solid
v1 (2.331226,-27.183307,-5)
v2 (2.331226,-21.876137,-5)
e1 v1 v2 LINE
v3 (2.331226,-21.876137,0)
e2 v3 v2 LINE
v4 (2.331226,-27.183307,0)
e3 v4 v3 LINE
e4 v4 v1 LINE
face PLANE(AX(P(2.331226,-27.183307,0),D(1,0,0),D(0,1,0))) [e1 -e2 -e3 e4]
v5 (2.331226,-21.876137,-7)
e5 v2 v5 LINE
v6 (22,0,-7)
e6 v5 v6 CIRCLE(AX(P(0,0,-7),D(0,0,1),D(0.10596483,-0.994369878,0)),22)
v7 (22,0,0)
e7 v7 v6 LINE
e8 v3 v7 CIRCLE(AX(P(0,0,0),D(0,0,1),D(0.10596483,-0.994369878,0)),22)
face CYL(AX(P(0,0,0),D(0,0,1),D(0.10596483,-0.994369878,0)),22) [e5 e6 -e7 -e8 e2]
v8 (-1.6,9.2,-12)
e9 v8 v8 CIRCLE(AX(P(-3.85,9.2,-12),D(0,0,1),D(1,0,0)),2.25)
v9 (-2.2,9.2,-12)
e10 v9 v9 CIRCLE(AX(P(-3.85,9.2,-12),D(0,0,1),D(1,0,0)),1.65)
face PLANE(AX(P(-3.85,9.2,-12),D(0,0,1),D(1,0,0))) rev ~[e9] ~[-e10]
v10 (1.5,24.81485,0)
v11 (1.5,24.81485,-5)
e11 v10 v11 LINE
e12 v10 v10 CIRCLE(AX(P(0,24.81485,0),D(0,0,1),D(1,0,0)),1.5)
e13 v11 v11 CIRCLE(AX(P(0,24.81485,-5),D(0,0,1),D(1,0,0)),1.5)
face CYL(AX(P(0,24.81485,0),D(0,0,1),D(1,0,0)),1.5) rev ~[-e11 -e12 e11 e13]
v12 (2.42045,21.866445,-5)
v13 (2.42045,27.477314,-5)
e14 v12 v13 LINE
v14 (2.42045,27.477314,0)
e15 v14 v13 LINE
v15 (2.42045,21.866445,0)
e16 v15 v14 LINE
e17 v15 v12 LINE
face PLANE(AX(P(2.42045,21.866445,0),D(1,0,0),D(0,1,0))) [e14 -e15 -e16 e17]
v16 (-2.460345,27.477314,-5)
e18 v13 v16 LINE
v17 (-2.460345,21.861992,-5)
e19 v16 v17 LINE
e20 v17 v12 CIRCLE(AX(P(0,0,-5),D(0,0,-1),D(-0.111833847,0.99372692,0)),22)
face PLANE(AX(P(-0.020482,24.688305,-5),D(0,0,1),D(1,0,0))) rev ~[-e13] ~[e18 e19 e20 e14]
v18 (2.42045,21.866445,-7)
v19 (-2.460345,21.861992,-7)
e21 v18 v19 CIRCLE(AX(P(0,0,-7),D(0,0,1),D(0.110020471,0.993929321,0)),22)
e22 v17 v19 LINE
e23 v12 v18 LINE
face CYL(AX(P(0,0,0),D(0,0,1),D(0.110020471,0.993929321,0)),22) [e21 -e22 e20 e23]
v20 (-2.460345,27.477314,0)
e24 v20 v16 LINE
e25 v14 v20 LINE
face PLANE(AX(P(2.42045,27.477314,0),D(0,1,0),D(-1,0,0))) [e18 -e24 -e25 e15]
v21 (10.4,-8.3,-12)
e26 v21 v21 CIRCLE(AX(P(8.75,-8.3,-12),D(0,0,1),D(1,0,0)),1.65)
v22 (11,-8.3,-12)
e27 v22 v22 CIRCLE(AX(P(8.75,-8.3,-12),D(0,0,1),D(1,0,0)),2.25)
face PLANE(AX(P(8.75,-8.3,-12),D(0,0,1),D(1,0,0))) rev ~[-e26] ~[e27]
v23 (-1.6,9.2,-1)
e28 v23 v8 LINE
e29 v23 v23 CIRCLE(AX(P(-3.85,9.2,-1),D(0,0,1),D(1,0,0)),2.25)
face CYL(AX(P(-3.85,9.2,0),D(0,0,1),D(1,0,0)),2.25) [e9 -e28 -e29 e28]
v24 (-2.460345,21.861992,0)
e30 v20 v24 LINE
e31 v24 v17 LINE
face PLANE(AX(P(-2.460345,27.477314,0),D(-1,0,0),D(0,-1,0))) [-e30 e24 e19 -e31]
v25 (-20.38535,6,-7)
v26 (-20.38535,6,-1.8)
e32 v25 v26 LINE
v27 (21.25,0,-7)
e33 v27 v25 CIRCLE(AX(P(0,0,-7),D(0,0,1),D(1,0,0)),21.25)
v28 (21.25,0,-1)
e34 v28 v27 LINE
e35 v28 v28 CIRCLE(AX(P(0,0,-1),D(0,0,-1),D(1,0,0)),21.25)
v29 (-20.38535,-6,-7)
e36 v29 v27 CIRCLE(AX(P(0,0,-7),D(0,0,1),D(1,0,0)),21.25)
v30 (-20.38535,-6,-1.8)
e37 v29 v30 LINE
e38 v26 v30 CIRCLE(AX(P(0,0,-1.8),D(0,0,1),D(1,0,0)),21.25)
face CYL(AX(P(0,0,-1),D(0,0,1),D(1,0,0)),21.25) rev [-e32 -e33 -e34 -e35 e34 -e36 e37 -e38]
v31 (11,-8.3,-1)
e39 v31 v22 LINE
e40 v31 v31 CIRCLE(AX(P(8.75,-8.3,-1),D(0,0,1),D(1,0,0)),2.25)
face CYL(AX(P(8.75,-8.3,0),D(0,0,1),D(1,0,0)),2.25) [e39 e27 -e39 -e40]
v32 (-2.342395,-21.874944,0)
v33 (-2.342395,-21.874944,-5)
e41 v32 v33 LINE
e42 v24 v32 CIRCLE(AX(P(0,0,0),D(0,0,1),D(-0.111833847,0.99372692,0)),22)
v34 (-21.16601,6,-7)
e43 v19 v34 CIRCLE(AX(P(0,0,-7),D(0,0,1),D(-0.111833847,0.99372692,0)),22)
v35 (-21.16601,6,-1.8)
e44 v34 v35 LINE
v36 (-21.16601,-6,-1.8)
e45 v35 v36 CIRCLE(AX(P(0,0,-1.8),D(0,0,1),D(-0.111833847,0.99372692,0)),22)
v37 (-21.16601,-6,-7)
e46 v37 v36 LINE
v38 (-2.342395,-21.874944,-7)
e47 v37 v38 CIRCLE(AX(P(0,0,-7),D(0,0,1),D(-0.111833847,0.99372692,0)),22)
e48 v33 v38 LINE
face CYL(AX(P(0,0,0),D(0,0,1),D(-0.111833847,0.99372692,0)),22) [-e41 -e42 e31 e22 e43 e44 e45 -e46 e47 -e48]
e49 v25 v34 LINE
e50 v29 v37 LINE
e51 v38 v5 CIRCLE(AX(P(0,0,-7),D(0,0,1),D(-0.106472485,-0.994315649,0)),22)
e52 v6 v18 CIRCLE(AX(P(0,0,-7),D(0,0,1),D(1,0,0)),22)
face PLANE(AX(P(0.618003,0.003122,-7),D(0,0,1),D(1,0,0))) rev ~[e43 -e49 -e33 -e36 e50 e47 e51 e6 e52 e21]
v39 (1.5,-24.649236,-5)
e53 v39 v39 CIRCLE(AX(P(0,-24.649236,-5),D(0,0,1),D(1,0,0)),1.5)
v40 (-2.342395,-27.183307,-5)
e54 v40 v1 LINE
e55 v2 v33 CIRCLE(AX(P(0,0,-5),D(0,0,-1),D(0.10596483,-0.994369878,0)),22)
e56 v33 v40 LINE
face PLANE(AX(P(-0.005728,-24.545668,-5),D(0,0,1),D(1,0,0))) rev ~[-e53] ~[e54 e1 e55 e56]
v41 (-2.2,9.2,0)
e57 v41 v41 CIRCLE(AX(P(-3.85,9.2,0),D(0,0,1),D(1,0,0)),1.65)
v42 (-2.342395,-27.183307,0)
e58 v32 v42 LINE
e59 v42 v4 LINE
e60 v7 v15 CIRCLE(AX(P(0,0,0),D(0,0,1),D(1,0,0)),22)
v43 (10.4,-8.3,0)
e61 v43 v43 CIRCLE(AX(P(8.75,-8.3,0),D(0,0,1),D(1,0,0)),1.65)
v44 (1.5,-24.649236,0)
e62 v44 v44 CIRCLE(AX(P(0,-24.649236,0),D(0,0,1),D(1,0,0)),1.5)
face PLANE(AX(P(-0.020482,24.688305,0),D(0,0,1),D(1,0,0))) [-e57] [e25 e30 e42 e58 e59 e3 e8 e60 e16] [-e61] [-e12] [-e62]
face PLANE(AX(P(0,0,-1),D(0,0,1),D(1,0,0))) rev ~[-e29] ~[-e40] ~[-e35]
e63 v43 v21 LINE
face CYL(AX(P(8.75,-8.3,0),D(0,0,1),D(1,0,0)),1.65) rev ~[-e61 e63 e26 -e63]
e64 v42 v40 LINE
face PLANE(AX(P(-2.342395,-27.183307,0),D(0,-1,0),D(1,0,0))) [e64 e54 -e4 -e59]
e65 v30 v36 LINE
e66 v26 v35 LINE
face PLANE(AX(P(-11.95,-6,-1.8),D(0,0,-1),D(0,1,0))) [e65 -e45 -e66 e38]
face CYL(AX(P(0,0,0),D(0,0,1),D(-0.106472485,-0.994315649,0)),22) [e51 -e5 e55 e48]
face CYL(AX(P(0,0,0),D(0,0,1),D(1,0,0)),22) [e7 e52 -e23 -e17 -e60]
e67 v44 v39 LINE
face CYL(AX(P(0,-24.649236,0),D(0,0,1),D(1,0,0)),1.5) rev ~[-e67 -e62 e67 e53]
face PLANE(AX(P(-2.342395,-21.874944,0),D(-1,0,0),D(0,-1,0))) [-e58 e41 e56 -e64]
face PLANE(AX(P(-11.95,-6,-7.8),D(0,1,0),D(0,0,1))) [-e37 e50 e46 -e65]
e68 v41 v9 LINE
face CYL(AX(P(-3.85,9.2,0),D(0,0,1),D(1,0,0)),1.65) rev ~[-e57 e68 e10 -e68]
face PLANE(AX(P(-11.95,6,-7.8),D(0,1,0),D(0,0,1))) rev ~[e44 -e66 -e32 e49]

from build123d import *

# Parameters (mm, degrees)
F0_W     = 23.9
F0_H     = 23
F1_DEPTH = 7
F0_R     = 2.25
F2_DEPTH = 1
F3_W     = 12
F3_H     = 6
F4_DEPTH = 25
F5_R     = 21.25
F6_DEPTH = 10
F0_R_2   = 1.65
F7_DEPTH = 12
F0_R_3   = 1.5
F8_DEPTH = 5


# Not quite as in the source:
# - a feature names something its author has since deleted; it is built from what else it names


with BuildPart() as f1:
    # F0 (on Top) → F1 (new body)
    with BuildSketch(Plane.XY):
        with BuildLine():
            ThreePointArc((2.3312262639, -21.8761373214), (16.3598132295, -14.70906221), (22, 0))
            ThreePointArc((22, 0), (16.3897820024, 14.6756616857), (2.4204503716, 21.86644507))
            ThreePointArc((2.4204503716, 21.86644507), (-0.0200709954, 21.9999908444), (-2.4603446274, 21.8619922311))
            ThreePointArc((-2.4603446274, 21.8619922311), (-21.9999200002, -0.059329476), (-2.3423946746, -21.8749442785))
            ThreePointArc((-2.3423946746, -21.8749442785), (-0.0056159761, -21.9999992832), (2.3312262639, -21.8761373214))
        make_face()
        Rectangle(F0_W, F0_H, mode=Mode.SUBTRACT)
    extrude(amount=-F1_DEPTH)

    # F0 (on Top) → F2 (join)
    with BuildSketch(Plane.XY):
        Rectangle(F0_W, F0_H)
        with Locations((8.75, -8.3)):
            Circle(F0_R, mode=Mode.SUBTRACT)
        with Locations((-3.85, 9.2)):
            Circle(F0_R, mode=Mode.SUBTRACT)
    extrude(amount=-F2_DEPTH)

    # F3 (on face) → F4 (cut)
    with BuildSketch(Plane.YZ.offset(-11.95)):
        with Locations((0, -4.8)):
            Rectangle(F3_W, F3_H)
    extrude(amount=-F4_DEPTH, mode=Mode.SUBTRACT)

    # F5 (on face) → F6 (cut)
    with BuildSketch(Plane(origin=(0, 0, -1), x_dir=(1, 0, 0), z_dir=(0, 0, -1))):
        Circle(F5_R)
    extrude(amount=F6_DEPTH, mode=Mode.SUBTRACT)

    # F0 (on Top) → F7 (join)
    with BuildSketch(Plane.XY):
        with Locations((-3.85, 9.2)):
            Circle(F0_R)
        with Locations((-3.85, 9.2)):
            Circle(F0_R_2, mode=Mode.SUBTRACT)
        with Locations((8.75, -8.3)):
            Circle(F0_R)
        with Locations((8.75, -8.3)):
            Circle(F0_R_2, mode=Mode.SUBTRACT)
    extrude(amount=-F7_DEPTH)

    # F0 (on Top) → F8 (join)
    with BuildSketch(Plane.XY):
        with BuildLine():
            ThreePointArc((-2.4603446274, 21.8619922311), (-0.0200709954, 21.9999908444), (2.4204503716, 21.86644507))
            Line((2.4204503716, 21.86644507), (2.4204503716, 27.4773144078))
            Line((2.4204503716, 27.4773144078), (-2.4603446274, 27.4773144078))
            Line((-2.4603446274, 27.4773144078), (-2.4603446274, 21.8619922311))
        make_face()
        with Locations((0, 24.8148497194)):
            Circle(F0_R_3, mode=Mode.SUBTRACT)
        with BuildLine():
            Line((2.3312262639, -27.183307051), (2.3312262639, -21.8761373214))
            ThreePointArc((2.3312262639, -21.8761373214), (-0.0056159761, -21.9999992832), (-2.3423946746, -21.8749442785))
            Line((-2.3423946746, -21.8749442785), (-2.3423946746, -27.183307051))
            Line((-2.3423946746, -27.183307051), (2.3312262639, -27.183307051))
        make_face()
        with Locations((0, -24.6492363513)):
            Circle(F0_R_3, mode=Mode.SUBTRACT)
    extrude(amount=-F8_DEPTH)


solid = f1.part
